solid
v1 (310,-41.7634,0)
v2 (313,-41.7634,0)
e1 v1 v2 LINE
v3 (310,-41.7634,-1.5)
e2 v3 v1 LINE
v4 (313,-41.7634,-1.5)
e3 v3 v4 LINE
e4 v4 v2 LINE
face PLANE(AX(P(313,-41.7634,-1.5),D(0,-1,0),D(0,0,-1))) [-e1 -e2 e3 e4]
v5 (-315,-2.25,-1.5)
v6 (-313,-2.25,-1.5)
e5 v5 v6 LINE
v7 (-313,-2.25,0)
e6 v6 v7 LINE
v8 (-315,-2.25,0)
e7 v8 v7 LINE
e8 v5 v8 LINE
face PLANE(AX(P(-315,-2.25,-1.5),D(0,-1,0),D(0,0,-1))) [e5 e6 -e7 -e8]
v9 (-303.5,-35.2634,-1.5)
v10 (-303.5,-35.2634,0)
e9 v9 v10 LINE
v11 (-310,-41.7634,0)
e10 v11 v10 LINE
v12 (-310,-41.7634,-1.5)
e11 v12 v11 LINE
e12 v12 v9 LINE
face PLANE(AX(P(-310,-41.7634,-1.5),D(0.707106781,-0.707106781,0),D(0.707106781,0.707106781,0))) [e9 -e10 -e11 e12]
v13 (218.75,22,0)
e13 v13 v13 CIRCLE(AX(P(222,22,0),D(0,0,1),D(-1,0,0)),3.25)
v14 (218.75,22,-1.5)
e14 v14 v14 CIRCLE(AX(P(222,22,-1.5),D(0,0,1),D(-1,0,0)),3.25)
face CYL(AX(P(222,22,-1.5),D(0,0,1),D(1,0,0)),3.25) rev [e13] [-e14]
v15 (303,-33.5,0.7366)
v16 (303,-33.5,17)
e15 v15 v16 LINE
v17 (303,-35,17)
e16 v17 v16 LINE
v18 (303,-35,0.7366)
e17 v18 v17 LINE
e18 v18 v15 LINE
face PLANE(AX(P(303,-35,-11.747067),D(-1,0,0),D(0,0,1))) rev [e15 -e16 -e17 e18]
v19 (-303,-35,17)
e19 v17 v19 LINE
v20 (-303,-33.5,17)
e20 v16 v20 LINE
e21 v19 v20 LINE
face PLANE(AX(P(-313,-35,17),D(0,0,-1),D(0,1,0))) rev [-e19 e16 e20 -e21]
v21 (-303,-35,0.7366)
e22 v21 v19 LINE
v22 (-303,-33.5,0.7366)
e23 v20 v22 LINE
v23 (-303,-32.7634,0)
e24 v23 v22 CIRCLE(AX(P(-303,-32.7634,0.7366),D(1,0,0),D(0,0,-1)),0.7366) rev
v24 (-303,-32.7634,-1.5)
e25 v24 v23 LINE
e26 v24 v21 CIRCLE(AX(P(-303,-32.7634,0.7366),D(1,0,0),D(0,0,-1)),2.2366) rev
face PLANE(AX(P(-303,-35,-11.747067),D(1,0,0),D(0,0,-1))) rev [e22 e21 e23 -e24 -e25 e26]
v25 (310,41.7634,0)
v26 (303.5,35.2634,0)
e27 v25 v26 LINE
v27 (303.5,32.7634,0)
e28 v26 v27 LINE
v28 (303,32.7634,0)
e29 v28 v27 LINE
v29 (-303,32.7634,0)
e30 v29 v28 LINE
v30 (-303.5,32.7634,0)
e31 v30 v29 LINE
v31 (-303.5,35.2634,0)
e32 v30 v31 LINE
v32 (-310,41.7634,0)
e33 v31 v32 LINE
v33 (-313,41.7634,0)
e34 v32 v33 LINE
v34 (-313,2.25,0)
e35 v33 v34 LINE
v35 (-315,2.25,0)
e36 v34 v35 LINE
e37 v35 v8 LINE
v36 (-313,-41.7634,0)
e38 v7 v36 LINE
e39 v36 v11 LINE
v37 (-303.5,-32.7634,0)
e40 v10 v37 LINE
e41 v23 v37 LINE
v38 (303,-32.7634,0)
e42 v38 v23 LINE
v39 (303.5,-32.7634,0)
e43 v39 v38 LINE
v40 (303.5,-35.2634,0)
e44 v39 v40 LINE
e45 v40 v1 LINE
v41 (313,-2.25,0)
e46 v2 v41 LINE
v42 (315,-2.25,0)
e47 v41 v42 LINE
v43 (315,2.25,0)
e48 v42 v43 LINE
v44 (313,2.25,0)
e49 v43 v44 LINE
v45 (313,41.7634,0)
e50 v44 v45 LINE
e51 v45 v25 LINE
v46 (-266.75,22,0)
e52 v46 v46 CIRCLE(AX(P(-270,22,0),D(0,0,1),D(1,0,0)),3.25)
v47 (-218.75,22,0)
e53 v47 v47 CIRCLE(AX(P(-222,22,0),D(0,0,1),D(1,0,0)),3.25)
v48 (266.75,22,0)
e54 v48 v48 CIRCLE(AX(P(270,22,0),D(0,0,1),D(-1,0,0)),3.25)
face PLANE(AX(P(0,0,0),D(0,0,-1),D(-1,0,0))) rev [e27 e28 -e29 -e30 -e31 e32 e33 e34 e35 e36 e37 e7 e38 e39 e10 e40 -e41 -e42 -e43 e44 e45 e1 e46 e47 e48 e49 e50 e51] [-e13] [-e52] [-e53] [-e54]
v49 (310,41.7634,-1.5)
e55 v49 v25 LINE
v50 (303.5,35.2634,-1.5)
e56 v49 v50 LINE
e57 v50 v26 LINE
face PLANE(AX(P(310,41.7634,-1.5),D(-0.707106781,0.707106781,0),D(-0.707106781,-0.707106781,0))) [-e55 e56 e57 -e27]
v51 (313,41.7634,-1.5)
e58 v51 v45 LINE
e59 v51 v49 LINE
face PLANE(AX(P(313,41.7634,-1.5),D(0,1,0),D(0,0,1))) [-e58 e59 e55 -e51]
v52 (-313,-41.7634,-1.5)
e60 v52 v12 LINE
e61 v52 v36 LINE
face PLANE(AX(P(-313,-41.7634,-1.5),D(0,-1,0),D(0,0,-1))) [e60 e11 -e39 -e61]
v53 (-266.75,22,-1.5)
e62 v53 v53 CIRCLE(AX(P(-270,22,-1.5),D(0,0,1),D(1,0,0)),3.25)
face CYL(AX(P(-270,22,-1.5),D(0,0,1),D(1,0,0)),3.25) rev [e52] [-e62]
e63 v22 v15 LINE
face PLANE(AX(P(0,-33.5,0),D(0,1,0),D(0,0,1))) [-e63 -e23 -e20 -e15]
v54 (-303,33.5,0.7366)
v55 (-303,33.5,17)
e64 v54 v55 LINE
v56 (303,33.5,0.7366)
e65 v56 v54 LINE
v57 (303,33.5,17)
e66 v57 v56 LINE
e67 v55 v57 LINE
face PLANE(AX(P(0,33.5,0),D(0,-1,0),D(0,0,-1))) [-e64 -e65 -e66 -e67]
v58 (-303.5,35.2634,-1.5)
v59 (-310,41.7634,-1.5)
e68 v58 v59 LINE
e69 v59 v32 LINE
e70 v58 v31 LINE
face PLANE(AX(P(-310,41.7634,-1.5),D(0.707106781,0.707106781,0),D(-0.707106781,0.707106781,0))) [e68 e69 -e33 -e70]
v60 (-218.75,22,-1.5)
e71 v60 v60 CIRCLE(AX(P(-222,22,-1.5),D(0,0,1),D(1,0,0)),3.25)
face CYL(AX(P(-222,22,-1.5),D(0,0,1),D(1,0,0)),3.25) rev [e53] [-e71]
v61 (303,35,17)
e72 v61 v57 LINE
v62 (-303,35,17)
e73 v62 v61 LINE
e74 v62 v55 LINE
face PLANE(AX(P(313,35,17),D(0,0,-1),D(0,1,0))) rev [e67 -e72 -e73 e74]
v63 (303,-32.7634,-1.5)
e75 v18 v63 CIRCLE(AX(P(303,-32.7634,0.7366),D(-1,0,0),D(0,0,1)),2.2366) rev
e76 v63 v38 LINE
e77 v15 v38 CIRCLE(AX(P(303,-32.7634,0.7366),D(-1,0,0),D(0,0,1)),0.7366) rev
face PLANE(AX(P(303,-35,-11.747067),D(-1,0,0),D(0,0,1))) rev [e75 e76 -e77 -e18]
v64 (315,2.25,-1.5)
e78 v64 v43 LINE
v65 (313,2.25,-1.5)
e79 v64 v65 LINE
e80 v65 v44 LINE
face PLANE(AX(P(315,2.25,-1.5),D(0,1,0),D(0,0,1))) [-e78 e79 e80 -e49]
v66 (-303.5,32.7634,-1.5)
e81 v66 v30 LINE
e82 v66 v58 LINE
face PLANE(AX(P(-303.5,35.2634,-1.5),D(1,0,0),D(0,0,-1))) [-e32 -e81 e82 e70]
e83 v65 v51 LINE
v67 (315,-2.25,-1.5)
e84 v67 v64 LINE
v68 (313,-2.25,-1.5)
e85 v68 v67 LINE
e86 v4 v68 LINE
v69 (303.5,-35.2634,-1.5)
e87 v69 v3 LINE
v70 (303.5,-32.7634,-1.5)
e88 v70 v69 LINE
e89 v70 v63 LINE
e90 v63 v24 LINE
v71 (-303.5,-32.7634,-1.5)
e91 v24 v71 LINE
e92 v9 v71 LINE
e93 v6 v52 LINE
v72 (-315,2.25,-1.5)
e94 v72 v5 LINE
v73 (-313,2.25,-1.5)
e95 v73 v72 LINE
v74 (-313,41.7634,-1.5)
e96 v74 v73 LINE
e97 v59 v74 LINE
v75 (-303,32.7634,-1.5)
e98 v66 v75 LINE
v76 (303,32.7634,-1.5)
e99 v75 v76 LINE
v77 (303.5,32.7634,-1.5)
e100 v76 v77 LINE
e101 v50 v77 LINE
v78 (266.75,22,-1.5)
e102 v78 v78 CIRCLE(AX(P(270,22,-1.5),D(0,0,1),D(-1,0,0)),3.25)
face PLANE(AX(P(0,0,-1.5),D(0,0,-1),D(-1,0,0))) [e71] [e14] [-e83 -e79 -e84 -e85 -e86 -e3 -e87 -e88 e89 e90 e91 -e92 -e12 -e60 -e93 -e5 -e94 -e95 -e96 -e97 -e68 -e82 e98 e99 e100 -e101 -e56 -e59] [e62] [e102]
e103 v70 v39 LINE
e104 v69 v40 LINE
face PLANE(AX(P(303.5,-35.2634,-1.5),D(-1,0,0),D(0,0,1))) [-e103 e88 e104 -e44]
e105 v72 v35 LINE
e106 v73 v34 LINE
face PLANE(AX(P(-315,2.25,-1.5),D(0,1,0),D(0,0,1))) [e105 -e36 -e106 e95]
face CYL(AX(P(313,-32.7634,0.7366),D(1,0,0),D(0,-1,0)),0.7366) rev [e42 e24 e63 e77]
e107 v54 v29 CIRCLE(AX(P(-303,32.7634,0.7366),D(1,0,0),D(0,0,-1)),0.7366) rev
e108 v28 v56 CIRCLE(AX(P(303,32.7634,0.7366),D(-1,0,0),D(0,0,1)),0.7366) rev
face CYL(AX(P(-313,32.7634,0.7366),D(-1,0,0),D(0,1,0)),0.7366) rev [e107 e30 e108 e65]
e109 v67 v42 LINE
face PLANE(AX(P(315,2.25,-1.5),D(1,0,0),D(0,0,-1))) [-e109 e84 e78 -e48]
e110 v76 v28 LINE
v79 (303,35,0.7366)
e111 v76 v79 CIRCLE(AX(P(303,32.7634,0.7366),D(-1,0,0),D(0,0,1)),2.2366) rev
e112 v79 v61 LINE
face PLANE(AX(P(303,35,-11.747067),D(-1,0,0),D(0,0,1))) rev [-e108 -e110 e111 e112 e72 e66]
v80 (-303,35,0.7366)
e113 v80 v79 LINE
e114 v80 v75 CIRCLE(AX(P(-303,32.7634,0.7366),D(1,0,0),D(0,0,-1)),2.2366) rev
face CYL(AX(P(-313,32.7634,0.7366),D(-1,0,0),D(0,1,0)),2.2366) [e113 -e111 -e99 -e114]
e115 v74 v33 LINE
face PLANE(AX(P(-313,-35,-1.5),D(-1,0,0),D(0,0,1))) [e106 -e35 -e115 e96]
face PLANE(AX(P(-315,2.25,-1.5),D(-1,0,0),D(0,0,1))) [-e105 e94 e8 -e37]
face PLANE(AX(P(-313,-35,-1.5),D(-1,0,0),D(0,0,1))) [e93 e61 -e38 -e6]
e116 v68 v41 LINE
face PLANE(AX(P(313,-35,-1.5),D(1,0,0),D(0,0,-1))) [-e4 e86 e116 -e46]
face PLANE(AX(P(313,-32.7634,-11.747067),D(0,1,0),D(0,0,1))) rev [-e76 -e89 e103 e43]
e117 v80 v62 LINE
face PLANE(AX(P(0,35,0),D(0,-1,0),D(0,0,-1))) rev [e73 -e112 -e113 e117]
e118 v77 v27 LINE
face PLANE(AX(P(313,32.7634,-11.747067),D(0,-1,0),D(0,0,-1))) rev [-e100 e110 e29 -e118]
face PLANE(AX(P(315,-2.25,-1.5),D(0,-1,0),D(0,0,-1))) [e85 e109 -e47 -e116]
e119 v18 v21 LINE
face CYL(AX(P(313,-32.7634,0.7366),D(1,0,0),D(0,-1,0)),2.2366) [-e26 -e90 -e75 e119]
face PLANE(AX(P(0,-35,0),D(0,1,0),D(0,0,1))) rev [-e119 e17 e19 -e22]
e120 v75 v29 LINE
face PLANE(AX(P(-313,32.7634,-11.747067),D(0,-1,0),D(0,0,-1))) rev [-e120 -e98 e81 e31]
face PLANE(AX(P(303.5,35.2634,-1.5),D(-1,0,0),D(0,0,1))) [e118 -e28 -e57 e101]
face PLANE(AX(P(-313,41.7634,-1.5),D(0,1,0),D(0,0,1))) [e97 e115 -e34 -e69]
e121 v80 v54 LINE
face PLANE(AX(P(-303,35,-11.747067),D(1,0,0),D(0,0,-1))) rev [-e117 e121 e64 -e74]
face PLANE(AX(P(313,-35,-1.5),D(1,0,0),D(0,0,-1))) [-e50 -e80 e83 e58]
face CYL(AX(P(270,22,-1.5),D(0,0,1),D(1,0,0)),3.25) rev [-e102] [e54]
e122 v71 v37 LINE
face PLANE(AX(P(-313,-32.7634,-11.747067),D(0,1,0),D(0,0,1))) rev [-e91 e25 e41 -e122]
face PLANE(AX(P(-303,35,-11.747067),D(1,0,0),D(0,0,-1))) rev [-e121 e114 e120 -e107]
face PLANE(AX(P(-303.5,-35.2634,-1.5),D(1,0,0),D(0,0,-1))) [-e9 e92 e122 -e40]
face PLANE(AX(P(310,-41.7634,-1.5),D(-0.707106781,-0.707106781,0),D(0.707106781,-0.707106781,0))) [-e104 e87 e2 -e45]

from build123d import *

# Parameters (mm, degrees)
SKETCH_1_W                         = 626
SKETCH_1_H                         = 70
SM_BASE_FLANGE_1_DEPTH             = 1.5
SM_EDGE_FLANGE_1_STRIP_W           = 7.4732
SM_EDGE_FLANGE_1_STRIP_H           = 1.5
SM_EDGE_FLANGE_1_STRIP_CUT_DEPTH   = 626
SM_EDGE_FLANGE_1_STRIP_2_W         = 7.4732
SM_EDGE_FLANGE_1_STRIP_2_H         = 1.5
SM_EDGE_FLANGE_1_STRIP_CUT_2_DEPTH = 626
SM_EDGE_FLANGE_1_DEPTH             = 626
SM_EDGE_FLANGE_1_BEND_DEPTH        = 626
SKETCH_8_W                         = 2
SKETCH_8_H                         = 4.5
SM_BASE_FLANGE_1_2_DEPTH           = 1.5
CUT_EXTRUDE_1_REACH                = 319.478
SKETCH_11_W                        = 10
SKETCH_11_H                        = 2.2366
SM_BASE_FLANGE_2_DEPTH             = 1.5
SKETCH_13_R                        = 3.25
CUT_EXTRUDE_2_DEPTH                = 1.5


# Sheet-metal steps are written as plain solids
with BuildPart() as part:
    # Sketch 1 → Sm Base Flange 1 (new body)
    with BuildSketch(Plane.XY):
        Rectangle(SKETCH_1_W, SKETCH_1_H)
    extrude(amount=-SM_BASE_FLANGE_1_DEPTH)

    # Ребро-кромка1 strip (across the edge) → Ребро-кромка1 strip cut (cut)
    with BuildSketch(Plane(origin=(313, 35, 0), x_dir=(0, -1, 0), z_dir=(-1, 0, 0))):
        with Locations((-1.5, -0.75)):
            Rectangle(SM_EDGE_FLANGE_1_STRIP_W, SM_EDGE_FLANGE_1_STRIP_H)
    extrude(amount=SM_EDGE_FLANGE_1_STRIP_CUT_DEPTH, mode=Mode.SUBTRACT)

    # Ребро-кромка1 strip 2 (across the edge) → Ребро-кромка1 strip cut 2 (cut)
    with BuildSketch(Plane(origin=(-313, -35, 0), x_dir=(0, 1, 0), z_dir=(1, 0, 0))):
        with Locations((-1.5, -0.75)):
            Rectangle(SM_EDGE_FLANGE_1_STRIP_2_W, SM_EDGE_FLANGE_1_STRIP_2_H)
    extrude(amount=SM_EDGE_FLANGE_1_STRIP_CUT_2_DEPTH, mode=Mode.SUBTRACT)

    # Ребро-кромка1 section (across the edge) → Ребро-кромка1 (add)
    with BuildSketch(Plane(origin=(313, 35, 0), x_dir=(0, -1, 0), z_dir=(-1, 0, 0))):
        with BuildLine():
            Line((0, 0.7366), (0, 17))
            Line((0, 17), (1.5, 17))
            Line((1.5, 17), (1.5, 0.7366))
            ThreePointArc((1.5, 0.7366), (1.715745145, 0.215745145), (2.2366, 0))
            Line((2.2366, 0), (2.2366, -1.5))
            ThreePointArc((2.2366, -1.5), (0.655084973, -0.844915027), (0, 0.7366))
        make_face()
    extrude(amount=SM_EDGE_FLANGE_1_DEPTH)

    # Ребро-кромка1 section 2 (across the edge) → Ребро-кромка1 bend (add)
    with BuildSketch(Plane(origin=(-313, -35, 0), x_dir=(0, 1, 0), z_dir=(1, 0, 0))):
        with BuildLine():
            Line((0, 0.7366), (0, 17))
            Line((0, 17), (1.5, 17))
            Line((1.5, 17), (1.5, 0.7366))
            ThreePointArc((1.5, 0.7366), (1.715745145, 0.215745145), (2.2366, 0))
            Line((2.2366, 0), (2.2366, -1.5))
            ThreePointArc((2.2366, -1.5), (0.655084973, -0.844915027), (0, 0.7366))
        make_face()
    extrude(amount=SM_EDGE_FLANGE_1_BEND_DEPTH)

    # Эскиз8 → Sm Base Flange 1 2 (add)
    with BuildSketch(Plane.XY):
        with Locations((-314, 0)):
            Rectangle(SKETCH_8_W, SKETCH_8_H)
        with Locations((314, 0)):
            Rectangle(SKETCH_8_W, SKETCH_8_H)
    extrude(amount=-SM_BASE_FLANGE_1_2_DEPTH)

    # Эскиз11 → Вырез-Вытянуть1 (cut, up to next)
    with BuildSketch(Plane.XY.offset(17), mode=Mode.PRIVATE) as cut_extrude_1_sk1:
        with Locations((-308, 33.8817)):
            Rectangle(SKETCH_11_W, SKETCH_11_H)
    cut_extrude_1_tool1 = extrude(cut_extrude_1_sk1.sketch, amount=-CUT_EXTRUDE_1_REACH, mode=Mode.PRIVATE) & part.part
    # Эскиз11 → Вырез-Вытянуть1 (cut, up to next)
    with BuildSketch(Plane.XY.offset(17), mode=Mode.PRIVATE) as cut_extrude_1_sk2:
        with Locations((-308, -33.8817)):
            Rectangle(SKETCH_11_W, SKETCH_11_H)
    cut_extrude_1_tool2 = extrude(cut_extrude_1_sk2.sketch, amount=-CUT_EXTRUDE_1_REACH, mode=Mode.PRIVATE) & part.part
    # Эскиз11 → Вырез-Вытянуть1 (cut, up to next)
    with BuildSketch(Plane.XY.offset(17), mode=Mode.PRIVATE) as cut_extrude_1_sk3:
        with Locations((308, -33.8817)):
            Rectangle(SKETCH_11_W, SKETCH_11_H)
    cut_extrude_1_tool3 = extrude(cut_extrude_1_sk3.sketch, amount=-CUT_EXTRUDE_1_REACH, mode=Mode.PRIVATE) & part.part
    # Эскиз11 → Вырез-Вытянуть1 (cut, up to next)
    with BuildSketch(Plane.XY.offset(17), mode=Mode.PRIVATE) as cut_extrude_1_sk4:
        with Locations((308, 33.8817)):
            Rectangle(SKETCH_11_W, SKETCH_11_H)
    cut_extrude_1_tool4 = extrude(cut_extrude_1_sk4.sketch, amount=-CUT_EXTRUDE_1_REACH, mode=Mode.PRIVATE) & part.part
    add(cut_extrude_1_tool1.solids().sort_by_distance((-308, 33.8817, 17))[0], mode=Mode.SUBTRACT)
    add(cut_extrude_1_tool2.solids().sort_by_distance((-308, -33.8817, 17))[0], mode=Mode.SUBTRACT)
    add(cut_extrude_1_tool3.solids().sort_by_distance((308, -33.8817, 17))[0], mode=Mode.SUBTRACT)
    add(cut_extrude_1_tool4.solids().sort_by_distance((308, 33.8817, 17))[0], mode=Mode.SUBTRACT)

    # Эскиз12 → Выступ2 (add)
    with BuildSketch(Plane.XY):
        Polygon((-313, 32.7634), (-313, 41.7634), (-310, 41.7634), (-303.5, 35.2634), (-303.5, 32.7634), align=None)
        Polygon((-303.5, -32.7634), (-313, -32.7634), (-313, -41.7634), (-310, -41.7634), (-303.5, -35.2634), align=None)
        Polygon((313, -32.7634), (313, -41.7634), (310, -41.7634), (303.5, -35.2634), (303.5, -32.7634), align=None)
        Polygon((303.5, 32.7634), (313, 32.7634), (313, 41.7634), (310, 41.7634), (303.5, 35.2634), align=None)
    extrude(amount=-SM_BASE_FLANGE_2_DEPTH)

    # Эскиз13 → Вырез-Вытянуть2 (cut)
    with BuildSketch(Plane.XY):
        with Locations((-270, 22)):
            Circle(SKETCH_13_R)
        with Locations((-222, 22)):
            Circle(SKETCH_13_R)
        with Locations(Location((222, 22, 0), (0, 0, 180))):
            Circle(SKETCH_13_R)
        with Locations(Location((270, 22, 0), (0, 0, 180))):
            Circle(SKETCH_13_R)
    extrude(amount=-CUT_EXTRUDE_2_DEPTH, mode=Mode.SUBTRACT)


solid = part.part
